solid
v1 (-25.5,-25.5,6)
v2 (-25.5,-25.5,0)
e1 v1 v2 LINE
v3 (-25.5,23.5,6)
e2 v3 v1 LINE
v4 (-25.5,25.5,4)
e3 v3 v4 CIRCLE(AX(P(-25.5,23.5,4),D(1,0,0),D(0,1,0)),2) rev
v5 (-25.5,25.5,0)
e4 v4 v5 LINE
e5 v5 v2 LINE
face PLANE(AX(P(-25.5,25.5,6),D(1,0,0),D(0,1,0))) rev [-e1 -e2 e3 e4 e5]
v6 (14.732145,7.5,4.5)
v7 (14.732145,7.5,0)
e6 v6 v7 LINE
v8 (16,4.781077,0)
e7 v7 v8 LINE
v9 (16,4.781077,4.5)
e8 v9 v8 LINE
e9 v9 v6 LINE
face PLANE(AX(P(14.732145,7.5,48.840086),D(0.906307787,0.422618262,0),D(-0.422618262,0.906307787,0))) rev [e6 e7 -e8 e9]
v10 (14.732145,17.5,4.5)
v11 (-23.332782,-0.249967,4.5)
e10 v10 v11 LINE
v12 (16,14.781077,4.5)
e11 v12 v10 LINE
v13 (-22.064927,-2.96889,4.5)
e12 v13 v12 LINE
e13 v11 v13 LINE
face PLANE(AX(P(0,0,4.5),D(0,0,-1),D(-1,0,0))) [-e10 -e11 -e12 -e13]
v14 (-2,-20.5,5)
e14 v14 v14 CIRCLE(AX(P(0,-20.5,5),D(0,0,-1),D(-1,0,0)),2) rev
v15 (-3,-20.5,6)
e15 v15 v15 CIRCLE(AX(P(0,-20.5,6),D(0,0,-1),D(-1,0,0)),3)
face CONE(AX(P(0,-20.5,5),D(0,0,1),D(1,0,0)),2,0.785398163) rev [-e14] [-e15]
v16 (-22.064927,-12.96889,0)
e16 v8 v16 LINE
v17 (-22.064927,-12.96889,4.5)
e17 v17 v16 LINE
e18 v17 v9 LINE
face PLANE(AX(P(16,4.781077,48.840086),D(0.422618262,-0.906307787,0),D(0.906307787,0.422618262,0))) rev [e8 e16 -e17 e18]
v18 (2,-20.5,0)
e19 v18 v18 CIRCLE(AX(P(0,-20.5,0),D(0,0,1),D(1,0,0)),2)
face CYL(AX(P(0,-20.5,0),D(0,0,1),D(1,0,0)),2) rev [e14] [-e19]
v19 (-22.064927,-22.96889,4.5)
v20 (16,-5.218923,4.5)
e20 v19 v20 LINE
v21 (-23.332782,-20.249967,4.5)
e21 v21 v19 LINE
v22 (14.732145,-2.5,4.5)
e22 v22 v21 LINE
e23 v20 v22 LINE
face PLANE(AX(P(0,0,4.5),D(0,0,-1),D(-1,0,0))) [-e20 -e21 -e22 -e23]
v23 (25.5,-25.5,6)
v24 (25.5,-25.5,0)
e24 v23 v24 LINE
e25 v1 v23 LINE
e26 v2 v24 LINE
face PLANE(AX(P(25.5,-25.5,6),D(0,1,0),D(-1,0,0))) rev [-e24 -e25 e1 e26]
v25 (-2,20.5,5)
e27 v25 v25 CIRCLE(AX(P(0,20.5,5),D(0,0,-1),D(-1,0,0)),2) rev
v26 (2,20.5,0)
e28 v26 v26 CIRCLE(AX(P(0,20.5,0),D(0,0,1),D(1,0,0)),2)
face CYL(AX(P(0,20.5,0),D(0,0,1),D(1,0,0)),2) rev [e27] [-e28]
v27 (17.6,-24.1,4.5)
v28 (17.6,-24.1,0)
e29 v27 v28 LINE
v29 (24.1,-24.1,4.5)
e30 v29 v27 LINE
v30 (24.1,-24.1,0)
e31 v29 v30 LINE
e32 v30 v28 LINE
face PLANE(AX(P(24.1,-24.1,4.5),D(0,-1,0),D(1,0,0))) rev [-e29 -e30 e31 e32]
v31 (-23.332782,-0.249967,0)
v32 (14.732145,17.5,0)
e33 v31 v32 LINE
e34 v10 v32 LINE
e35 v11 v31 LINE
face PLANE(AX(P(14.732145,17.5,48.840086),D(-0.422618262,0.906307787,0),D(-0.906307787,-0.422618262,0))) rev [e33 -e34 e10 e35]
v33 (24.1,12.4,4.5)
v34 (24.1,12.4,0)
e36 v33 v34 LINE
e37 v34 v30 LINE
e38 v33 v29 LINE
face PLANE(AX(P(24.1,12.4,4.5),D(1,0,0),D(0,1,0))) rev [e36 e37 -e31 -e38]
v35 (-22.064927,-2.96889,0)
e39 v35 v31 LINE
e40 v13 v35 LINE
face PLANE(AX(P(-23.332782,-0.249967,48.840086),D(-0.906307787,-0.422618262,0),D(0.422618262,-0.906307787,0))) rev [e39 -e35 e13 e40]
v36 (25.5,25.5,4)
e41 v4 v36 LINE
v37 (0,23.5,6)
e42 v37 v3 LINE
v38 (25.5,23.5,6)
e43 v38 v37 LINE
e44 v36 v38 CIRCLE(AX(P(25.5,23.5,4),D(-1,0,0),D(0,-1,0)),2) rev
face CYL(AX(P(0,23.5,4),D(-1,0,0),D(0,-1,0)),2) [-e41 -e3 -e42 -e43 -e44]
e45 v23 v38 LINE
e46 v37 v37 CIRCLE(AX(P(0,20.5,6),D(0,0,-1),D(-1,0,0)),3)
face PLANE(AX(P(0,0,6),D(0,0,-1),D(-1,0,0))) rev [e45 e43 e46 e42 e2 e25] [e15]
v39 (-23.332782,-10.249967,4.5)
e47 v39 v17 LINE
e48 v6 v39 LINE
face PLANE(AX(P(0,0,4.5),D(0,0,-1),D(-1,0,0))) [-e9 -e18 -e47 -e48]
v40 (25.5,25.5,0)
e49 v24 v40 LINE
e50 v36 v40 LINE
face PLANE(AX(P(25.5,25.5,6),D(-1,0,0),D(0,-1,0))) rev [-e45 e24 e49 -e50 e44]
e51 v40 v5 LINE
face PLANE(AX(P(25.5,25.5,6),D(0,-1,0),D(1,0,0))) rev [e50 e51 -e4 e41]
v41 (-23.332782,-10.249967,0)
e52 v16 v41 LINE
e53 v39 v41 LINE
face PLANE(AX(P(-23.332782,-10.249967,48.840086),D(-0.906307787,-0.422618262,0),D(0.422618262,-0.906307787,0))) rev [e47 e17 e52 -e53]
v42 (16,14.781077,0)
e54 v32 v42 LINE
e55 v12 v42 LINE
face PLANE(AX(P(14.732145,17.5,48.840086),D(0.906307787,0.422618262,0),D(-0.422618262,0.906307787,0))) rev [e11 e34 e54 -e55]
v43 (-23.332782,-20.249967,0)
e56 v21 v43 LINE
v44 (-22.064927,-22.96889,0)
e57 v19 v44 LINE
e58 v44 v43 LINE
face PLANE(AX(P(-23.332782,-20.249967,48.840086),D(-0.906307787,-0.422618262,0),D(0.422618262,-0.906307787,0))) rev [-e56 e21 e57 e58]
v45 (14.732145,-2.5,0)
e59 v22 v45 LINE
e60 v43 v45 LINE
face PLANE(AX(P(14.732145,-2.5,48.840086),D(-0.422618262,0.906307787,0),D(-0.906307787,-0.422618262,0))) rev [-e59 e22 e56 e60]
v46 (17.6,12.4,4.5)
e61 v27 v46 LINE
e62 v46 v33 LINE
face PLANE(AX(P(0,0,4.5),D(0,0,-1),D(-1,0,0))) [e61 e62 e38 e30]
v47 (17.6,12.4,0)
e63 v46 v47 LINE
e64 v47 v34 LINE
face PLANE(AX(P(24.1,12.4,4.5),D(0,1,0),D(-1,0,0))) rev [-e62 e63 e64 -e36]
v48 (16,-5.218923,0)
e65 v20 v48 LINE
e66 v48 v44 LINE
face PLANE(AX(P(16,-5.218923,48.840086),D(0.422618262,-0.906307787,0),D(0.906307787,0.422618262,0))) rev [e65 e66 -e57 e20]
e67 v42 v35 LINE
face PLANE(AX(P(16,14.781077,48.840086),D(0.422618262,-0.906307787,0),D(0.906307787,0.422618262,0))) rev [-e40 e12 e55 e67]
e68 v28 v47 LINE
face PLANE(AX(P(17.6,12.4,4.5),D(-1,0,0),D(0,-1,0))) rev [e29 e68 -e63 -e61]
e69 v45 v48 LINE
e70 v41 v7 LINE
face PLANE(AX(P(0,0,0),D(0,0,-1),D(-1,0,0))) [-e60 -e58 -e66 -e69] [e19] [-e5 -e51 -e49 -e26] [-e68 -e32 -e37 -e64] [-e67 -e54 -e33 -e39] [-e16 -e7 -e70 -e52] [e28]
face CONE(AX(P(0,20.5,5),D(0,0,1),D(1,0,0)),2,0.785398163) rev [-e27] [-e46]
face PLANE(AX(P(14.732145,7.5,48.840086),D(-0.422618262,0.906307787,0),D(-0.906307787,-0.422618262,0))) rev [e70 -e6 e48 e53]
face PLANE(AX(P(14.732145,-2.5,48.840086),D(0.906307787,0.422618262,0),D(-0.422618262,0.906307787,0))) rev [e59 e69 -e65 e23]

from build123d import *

# Parameters (mm, degrees)
ESBO_O1_W                = 51
ESBO_O1_H                = 51
RESSALTO_EXTRUS_O1_DEPTH = 6
ESBO_O2_W                = 6.5
ESBO_O2_H                = 36.5
CORTE_EXTRUS_O1_DEPTH    = 4.5
ESBO_O3_R                = 2
CORTE_EXTRUS_O2_DEPTH    = 37.558172821
CORTE_EXTRUS_O3_DEPTH    = 4.5
PADR_O_LINEAR1_COUNT     = 3
PADR_O_LINEAR1_PITCH     = 10
FILETE1_R                = 2
CHANFRO1_SIZE            = 1


with BuildPart() as part:
    # Esboço1 → Ressalto-extrusão1 (new body)
    with BuildSketch(Plane.XY):
        Rectangle(ESBO_O1_W, ESBO_O1_H)
    extrude(amount=RESSALTO_EXTRUS_O1_DEPTH)

    # Esboço2 → Corte-extrusão1 (cut)
    with BuildSketch(Plane(origin=(0, 0, 0), x_dir=(-1, 0, 0), z_dir=(0, 0, -1))):
        with Locations((-20.85, -5.85)):
            Rectangle(ESBO_O2_W, ESBO_O2_H)
    extrude(amount=-CORTE_EXTRUS_O1_DEPTH, mode=Mode.SUBTRACT)

    # Esboço3 → Corte-extrusão2 (cut, through all)
    with BuildSketch(Plane.XY.offset(6)):
        with Locations((0, -20.5)):
            Circle(ESBO_O3_R)
        with Locations((0, 20.5)):
            Circle(ESBO_O3_R)
    extrude(amount=-CORTE_EXTRUS_O2_DEPTH, mode=Mode.SUBTRACT)

    # Esboço4 → Corte-extrusão3 (cut)
    with BuildSketch(Plane(origin=(0, 0, 0), x_dir=(-1, 0, 0), z_dir=(0, 0, -1))):
        Polygon((-14.732145215, 17.5), (23.332781841, -0.249966993), (22.064927056, -2.968890354), (-16, 14.781076639), align=None)
    corte_extrus_o3 = extrude(amount=-CORTE_EXTRUS_O3_DEPTH, mode=Mode.SUBTRACT)

    # Padrão linear1: Corte-extrusão3 ×3
    with Locations(*[(0, -i * PADR_O_LINEAR1_PITCH, 0) for i in range(1, PADR_O_LINEAR1_COUNT)]):
        add(corte_extrus_o3, mode=Mode.SUBTRACT)

    # Filete1
    filete1_edges = [part.edges().sort_by_distance(p)[0] for p in [
        (0, 25.5, 6),
    ]]
    fillet(filete1_edges, radius=FILETE1_R)

    # Chanfro1
    chanfro1_edges = [part.edges().sort_by_distance(p)[0] for p in [
        (-2, -20.5, 6),
        (-2, 20.5, 6),
    ]]
    chamfer(chanfro1_edges, length=CHANFRO1_SIZE - 0.0001)  # a hair under: the kernel refuses the full size


solid = part.part
